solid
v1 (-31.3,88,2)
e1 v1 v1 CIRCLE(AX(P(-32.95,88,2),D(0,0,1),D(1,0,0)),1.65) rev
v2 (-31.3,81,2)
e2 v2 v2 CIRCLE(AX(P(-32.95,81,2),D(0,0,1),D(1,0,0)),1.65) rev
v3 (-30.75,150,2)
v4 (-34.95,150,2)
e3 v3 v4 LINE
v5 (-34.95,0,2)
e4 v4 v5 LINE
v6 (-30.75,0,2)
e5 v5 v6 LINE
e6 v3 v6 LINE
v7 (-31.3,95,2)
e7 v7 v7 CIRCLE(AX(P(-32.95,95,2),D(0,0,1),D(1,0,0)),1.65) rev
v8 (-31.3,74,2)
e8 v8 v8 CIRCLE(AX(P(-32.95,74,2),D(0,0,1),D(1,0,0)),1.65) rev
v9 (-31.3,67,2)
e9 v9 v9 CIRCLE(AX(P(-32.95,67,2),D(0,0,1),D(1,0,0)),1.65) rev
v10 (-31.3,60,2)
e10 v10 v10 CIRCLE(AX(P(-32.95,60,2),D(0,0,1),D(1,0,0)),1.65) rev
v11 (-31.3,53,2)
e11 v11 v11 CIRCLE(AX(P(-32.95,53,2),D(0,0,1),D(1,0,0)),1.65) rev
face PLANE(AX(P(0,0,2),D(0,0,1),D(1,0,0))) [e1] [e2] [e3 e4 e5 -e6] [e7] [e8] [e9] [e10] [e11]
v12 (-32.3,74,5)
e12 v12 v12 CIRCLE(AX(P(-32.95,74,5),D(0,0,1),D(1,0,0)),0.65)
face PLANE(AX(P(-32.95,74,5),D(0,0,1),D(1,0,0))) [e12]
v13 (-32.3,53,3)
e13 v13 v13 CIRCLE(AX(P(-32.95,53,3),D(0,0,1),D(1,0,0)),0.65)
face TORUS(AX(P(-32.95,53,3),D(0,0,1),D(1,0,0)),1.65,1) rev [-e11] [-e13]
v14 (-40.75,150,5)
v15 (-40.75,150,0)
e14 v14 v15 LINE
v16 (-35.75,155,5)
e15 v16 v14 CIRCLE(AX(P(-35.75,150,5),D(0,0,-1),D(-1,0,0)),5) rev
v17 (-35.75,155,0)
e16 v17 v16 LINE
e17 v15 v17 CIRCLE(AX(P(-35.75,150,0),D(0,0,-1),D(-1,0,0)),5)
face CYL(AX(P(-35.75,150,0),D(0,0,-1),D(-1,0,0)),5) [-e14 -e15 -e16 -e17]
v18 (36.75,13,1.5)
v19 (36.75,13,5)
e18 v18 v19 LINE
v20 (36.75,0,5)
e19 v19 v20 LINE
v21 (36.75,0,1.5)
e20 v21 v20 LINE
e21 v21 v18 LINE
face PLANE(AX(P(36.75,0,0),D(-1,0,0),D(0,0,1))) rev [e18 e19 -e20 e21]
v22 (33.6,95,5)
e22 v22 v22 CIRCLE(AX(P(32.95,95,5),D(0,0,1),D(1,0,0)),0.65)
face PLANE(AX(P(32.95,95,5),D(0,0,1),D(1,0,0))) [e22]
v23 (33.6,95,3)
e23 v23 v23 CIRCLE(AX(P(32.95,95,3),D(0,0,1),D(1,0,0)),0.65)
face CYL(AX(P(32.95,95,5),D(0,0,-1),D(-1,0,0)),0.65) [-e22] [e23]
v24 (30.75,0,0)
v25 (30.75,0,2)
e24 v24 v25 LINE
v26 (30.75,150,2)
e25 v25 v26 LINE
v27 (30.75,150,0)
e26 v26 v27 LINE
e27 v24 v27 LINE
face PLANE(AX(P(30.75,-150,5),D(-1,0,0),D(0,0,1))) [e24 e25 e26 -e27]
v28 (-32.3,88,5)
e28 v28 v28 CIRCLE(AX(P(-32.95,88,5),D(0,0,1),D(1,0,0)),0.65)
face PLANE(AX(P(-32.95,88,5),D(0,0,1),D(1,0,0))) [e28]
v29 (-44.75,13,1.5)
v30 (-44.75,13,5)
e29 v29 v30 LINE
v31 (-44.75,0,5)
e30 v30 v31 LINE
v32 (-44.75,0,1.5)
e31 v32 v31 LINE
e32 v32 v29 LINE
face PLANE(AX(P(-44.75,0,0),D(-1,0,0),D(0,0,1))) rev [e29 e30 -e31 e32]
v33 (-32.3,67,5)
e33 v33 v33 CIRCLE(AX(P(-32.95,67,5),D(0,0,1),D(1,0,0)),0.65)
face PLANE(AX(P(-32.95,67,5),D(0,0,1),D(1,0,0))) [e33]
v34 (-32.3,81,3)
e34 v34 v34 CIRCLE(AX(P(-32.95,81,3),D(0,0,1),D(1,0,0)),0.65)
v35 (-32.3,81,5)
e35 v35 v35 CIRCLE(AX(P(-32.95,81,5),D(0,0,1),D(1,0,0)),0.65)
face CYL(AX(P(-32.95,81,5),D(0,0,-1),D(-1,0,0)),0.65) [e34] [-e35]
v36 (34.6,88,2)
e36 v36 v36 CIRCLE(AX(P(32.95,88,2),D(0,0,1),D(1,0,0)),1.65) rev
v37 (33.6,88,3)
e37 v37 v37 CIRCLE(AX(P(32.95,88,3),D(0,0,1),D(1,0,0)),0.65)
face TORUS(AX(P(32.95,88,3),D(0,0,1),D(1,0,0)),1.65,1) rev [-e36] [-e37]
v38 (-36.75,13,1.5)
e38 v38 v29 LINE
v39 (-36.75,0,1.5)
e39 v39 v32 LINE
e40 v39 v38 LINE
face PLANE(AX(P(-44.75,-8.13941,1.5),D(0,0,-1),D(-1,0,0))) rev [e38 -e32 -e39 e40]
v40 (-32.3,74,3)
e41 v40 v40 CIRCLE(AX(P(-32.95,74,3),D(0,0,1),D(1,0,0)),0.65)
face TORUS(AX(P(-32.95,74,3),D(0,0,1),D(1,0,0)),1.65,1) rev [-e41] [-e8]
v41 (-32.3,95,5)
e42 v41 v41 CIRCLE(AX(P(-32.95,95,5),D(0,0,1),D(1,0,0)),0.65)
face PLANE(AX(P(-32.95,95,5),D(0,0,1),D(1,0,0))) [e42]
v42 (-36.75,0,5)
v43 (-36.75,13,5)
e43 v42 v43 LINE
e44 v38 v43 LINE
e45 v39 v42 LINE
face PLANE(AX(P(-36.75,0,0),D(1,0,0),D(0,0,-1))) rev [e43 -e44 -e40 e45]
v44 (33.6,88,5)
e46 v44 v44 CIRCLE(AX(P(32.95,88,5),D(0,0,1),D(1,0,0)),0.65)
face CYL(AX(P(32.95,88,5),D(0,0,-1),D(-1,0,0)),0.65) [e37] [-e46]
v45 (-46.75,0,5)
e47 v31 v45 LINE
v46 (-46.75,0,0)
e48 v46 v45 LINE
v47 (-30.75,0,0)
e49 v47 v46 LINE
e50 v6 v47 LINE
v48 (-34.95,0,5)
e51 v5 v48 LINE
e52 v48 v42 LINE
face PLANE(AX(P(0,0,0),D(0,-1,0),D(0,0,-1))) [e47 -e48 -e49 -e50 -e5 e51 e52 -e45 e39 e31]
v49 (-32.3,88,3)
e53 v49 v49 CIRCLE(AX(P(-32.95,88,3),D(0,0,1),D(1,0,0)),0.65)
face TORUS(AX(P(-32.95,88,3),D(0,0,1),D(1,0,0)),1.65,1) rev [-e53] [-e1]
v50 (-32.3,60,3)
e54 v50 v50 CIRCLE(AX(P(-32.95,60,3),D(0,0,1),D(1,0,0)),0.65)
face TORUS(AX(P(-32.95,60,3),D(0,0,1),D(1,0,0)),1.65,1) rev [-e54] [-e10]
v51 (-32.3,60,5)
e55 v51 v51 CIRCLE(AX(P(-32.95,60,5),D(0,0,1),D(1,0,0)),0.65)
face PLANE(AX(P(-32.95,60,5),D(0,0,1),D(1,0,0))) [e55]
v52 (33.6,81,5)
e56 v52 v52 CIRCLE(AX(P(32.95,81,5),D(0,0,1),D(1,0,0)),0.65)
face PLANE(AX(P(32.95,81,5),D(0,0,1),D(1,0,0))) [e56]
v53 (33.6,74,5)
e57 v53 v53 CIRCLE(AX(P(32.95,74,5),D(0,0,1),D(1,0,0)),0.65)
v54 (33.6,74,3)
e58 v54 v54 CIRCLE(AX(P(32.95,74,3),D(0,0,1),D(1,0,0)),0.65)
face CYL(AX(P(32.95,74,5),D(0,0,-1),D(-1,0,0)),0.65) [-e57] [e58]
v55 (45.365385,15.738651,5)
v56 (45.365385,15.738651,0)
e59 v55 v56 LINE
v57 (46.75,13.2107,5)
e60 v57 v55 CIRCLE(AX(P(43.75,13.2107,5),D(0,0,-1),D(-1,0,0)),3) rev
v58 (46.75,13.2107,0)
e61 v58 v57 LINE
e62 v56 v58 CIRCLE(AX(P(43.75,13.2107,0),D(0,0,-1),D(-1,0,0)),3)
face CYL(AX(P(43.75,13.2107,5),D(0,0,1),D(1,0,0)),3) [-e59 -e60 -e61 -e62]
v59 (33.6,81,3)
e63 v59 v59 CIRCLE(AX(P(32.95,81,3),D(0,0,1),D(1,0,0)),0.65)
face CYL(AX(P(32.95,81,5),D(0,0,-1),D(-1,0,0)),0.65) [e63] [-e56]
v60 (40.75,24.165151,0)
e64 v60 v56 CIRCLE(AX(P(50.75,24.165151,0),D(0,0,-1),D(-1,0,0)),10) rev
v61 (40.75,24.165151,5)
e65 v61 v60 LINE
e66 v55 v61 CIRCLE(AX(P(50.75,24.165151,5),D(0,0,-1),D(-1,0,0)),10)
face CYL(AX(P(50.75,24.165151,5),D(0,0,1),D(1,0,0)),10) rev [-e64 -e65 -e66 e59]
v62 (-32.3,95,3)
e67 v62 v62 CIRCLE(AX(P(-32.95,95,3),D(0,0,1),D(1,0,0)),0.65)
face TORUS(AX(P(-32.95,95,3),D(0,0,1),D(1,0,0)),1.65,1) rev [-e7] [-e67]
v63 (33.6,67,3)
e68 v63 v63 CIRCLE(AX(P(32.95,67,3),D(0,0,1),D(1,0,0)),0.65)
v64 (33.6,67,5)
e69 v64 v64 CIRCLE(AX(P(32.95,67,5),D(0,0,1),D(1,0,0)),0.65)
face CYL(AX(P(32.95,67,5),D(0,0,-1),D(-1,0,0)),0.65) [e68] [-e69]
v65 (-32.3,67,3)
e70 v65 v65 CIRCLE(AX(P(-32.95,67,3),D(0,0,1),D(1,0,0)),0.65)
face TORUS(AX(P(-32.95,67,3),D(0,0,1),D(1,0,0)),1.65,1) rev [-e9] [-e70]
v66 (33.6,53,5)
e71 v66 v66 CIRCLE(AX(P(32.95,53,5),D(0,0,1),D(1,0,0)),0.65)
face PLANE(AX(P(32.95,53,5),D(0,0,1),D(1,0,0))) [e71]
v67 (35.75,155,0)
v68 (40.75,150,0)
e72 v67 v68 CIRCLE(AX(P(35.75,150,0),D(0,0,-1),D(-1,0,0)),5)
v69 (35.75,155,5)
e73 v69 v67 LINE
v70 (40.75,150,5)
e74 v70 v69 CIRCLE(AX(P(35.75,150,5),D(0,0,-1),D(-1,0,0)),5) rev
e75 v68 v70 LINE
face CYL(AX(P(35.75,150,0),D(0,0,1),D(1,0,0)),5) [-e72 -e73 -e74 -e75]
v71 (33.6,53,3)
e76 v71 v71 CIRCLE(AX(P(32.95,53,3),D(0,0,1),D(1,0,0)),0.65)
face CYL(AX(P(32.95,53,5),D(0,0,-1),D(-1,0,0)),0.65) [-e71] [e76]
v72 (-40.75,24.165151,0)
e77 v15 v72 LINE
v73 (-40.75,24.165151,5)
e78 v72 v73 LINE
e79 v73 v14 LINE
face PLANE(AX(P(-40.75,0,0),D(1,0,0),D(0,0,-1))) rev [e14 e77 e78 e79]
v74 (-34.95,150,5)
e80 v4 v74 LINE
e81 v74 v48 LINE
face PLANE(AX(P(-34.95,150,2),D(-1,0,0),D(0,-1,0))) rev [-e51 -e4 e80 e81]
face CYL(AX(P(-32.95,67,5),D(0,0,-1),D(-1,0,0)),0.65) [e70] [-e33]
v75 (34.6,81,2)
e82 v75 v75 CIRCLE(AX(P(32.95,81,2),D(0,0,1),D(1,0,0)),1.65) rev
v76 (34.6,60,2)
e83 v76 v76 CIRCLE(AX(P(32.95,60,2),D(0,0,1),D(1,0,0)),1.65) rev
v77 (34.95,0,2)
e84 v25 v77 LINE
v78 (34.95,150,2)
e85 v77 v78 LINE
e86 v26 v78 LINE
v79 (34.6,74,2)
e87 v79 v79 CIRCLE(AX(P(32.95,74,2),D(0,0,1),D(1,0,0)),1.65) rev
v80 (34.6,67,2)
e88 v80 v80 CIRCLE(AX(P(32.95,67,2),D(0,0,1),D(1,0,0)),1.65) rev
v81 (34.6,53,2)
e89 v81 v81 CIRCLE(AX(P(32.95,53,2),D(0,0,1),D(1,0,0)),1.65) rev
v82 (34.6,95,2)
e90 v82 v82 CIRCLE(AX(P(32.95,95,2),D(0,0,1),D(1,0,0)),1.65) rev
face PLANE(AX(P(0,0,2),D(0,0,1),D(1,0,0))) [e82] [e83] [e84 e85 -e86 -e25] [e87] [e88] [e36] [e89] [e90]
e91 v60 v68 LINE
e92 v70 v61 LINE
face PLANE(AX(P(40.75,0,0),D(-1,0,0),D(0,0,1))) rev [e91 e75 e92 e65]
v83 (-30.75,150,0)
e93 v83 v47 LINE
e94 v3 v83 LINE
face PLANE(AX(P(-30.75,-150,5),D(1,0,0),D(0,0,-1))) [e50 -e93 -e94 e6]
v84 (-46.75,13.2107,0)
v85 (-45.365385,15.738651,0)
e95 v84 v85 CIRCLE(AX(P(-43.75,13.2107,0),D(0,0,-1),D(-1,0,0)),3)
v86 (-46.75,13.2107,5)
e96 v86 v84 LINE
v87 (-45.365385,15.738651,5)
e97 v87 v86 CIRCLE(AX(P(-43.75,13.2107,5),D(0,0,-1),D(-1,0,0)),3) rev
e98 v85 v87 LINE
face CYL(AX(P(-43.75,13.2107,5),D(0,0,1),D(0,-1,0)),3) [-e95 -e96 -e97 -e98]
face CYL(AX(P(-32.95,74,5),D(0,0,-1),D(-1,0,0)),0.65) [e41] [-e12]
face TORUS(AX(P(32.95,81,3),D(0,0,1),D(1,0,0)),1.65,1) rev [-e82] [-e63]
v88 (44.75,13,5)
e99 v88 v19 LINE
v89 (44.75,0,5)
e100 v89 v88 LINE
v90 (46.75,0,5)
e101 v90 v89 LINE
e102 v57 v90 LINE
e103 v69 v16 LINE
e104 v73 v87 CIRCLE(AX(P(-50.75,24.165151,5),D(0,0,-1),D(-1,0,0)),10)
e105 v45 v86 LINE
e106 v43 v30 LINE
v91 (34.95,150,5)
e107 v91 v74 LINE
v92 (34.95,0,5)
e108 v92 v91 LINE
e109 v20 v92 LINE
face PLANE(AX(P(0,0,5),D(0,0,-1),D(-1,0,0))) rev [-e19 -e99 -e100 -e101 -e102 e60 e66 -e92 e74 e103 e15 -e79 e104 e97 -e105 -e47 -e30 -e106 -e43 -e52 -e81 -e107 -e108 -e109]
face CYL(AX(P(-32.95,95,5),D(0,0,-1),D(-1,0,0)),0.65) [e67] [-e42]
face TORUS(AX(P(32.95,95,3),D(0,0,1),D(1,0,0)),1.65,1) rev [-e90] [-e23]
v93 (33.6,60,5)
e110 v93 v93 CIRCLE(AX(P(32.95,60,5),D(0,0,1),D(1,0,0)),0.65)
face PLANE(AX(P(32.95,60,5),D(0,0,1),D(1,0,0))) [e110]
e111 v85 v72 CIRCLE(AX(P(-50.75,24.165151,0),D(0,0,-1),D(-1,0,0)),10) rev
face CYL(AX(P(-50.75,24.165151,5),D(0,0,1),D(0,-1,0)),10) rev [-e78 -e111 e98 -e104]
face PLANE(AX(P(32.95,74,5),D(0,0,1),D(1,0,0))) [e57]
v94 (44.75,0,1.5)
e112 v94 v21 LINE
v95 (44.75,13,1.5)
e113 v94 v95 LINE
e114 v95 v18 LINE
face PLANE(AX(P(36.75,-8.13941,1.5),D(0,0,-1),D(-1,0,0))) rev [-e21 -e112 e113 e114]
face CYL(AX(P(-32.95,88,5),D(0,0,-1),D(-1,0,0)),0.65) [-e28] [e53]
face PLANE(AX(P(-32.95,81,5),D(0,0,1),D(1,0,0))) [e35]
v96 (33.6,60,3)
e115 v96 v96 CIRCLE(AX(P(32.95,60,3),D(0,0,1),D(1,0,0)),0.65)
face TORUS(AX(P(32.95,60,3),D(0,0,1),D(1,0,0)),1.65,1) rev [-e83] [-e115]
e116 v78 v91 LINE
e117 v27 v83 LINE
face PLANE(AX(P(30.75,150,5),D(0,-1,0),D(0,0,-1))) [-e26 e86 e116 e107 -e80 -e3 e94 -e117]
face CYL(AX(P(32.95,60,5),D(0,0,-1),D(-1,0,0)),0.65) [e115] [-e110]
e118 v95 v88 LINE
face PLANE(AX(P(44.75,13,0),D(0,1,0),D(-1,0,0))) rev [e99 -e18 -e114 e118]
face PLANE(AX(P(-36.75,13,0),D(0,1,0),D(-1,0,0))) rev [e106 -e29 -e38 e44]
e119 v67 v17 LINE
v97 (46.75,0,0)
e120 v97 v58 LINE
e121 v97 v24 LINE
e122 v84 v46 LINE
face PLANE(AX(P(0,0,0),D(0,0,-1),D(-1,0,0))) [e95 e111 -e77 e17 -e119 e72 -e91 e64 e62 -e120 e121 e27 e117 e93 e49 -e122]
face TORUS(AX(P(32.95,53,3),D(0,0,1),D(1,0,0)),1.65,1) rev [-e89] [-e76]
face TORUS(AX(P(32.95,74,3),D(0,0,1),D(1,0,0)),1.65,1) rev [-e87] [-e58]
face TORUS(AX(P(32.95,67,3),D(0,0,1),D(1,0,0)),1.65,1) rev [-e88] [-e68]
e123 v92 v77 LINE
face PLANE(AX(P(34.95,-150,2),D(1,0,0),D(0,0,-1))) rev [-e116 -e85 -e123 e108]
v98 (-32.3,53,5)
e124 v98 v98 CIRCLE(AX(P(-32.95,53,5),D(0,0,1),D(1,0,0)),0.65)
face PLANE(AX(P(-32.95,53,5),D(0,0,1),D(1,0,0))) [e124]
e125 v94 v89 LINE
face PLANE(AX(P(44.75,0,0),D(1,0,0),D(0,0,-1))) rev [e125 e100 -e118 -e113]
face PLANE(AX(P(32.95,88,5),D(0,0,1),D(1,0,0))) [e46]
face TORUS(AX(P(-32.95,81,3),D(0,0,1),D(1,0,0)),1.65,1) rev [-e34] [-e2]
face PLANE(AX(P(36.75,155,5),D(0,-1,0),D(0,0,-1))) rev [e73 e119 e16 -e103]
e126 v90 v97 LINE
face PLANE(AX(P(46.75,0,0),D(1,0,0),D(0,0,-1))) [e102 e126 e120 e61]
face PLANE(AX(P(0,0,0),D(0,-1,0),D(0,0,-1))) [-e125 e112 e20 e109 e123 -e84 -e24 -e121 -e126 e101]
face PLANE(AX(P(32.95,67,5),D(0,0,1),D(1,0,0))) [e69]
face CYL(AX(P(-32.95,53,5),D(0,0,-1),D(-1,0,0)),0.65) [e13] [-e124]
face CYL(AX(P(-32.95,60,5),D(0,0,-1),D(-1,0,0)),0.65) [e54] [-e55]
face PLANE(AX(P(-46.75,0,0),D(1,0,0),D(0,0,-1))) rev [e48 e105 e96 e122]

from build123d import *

# Parameters (mm, degrees)
STOCK_ARRAYRAMME_1_OUTLINE_R   = 0.65
STOCK_ARRAYRAMME_1_DEPTH       = 5
STOCK_ARRAYRAMME_1_2_OUTLINE_W = 4.2
STOCK_ARRAYRAMME_1_2_OUTLINE_H = 150
STOCK_ARRAYRAMME_1_2_OUTLINE_R = 0.65
STOCK_ARRAYRAMME_1_2_DEPTH     = 2
SKETCH1_W                      = 15
SKETCH1_H                      = 5
BOSS_EXTRUDE1_DEPTH            = 10
SKETCH2_W                      = 8
SKETCH2_H                      = 13
CUT_EXTRUDE1_DEPTH             = 162.97395624
SKETCH3_W                      = 15
SKETCH3_H                      = 5
BOSS_EXTRUDE2_DEPTH            = 10
SKETCH4_W                      = 8
SKETCH4_H                      = 13
CUT_EXTRUDE2_DEPTH             = 162.97395624
FILLET4_R                      = 1
SKETCH5_W                      = 8
SKETCH5_H                      = 1.5
BOSS_EXTRUDE3_DEPTH            = 13
SKETCH7_W                      = 140
SKETCH7_H                      = 5
BOSS_EXTRUDE4_DEPTH            = 4
SKETCH8_W                      = 140
SKETCH8_H                      = 5
BOSS_EXTRUDE5_DEPTH            = 4
FILLET5_R                      = 5
FILLET6_R                      = 10
FILLET7_R                      = 3


# Read off the part's stored shape, not the designer's step: Stock-arrayRamme-1
with BuildPart() as part:
    # Stock-arrayRamme-1 outline → Stock-arrayRamme-1 (new body)
    with BuildSketch(Plane.XY):
        Polygon((34.95, 150), (34.95, 0), (36.75, 0), (36.75, 155), (-36.75, 155), (-36.75, 0), (-34.95, 0), (-34.95, 150), align=None)
        with Locations((-32.95, 67)):
            Circle(STOCK_ARRAYRAMME_1_OUTLINE_R)
        with Locations((-32.95, 60)):
            Circle(STOCK_ARRAYRAMME_1_OUTLINE_R)
        with Locations((-32.95, 74)):
            Circle(STOCK_ARRAYRAMME_1_OUTLINE_R)
        with Locations((-32.95, 81)):
            Circle(STOCK_ARRAYRAMME_1_OUTLINE_R)
        with Locations((-32.95, 88)):
            Circle(STOCK_ARRAYRAMME_1_OUTLINE_R)
        with Locations((-32.95, 95)):
            Circle(STOCK_ARRAYRAMME_1_OUTLINE_R)
        with Locations((-32.95, 53)):
            Circle(STOCK_ARRAYRAMME_1_OUTLINE_R)
        with Locations((32.95, 67)):
            Circle(STOCK_ARRAYRAMME_1_OUTLINE_R)
        with Locations((32.95, 53)):
            Circle(STOCK_ARRAYRAMME_1_OUTLINE_R)
        with Locations((32.95, 60)):
            Circle(STOCK_ARRAYRAMME_1_OUTLINE_R)
        with Locations((32.95, 74)):
            Circle(STOCK_ARRAYRAMME_1_OUTLINE_R)
        with Locations((32.95, 81)):
            Circle(STOCK_ARRAYRAMME_1_OUTLINE_R)
        with Locations((32.95, 95)):
            Circle(STOCK_ARRAYRAMME_1_OUTLINE_R)
        with Locations((32.95, 88)):
            Circle(STOCK_ARRAYRAMME_1_OUTLINE_R)
    extrude(amount=STOCK_ARRAYRAMME_1_DEPTH)

    # Stock-arrayRamme-1 2 outline → Stock-arrayRamme-1 2 (add)
    # profile 1 of 2: a face of its own
    with BuildSketch(Plane.XY):
        with Locations((32.85, 75)):
            Rectangle(STOCK_ARRAYRAMME_1_2_OUTLINE_W, STOCK_ARRAYRAMME_1_2_OUTLINE_H)
        with Locations((32.95, 53)):
            Circle(STOCK_ARRAYRAMME_1_2_OUTLINE_R, mode=Mode.SUBTRACT)
        with Locations((32.95, 60)):
            Circle(STOCK_ARRAYRAMME_1_2_OUTLINE_R, mode=Mode.SUBTRACT)
        with Locations((32.95, 67)):
            Circle(STOCK_ARRAYRAMME_1_2_OUTLINE_R, mode=Mode.SUBTRACT)
        with Locations((32.95, 74)):
            Circle(STOCK_ARRAYRAMME_1_2_OUTLINE_R, mode=Mode.SUBTRACT)
        with Locations((32.95, 81)):
            Circle(STOCK_ARRAYRAMME_1_2_OUTLINE_R, mode=Mode.SUBTRACT)
        with Locations((32.95, 88)):
            Circle(STOCK_ARRAYRAMME_1_2_OUTLINE_R, mode=Mode.SUBTRACT)
        with Locations((32.95, 95)):
            Circle(STOCK_ARRAYRAMME_1_2_OUTLINE_R, mode=Mode.SUBTRACT)
    # profile 2 of 2: a face of its own
    with BuildSketch(Plane.XY):
        with Locations((-32.85, 75)):
            Rectangle(STOCK_ARRAYRAMME_1_2_OUTLINE_W, STOCK_ARRAYRAMME_1_2_OUTLINE_H)
        with Locations((-32.95, 53)):
            Circle(STOCK_ARRAYRAMME_1_2_OUTLINE_R, mode=Mode.SUBTRACT)
        with Locations((-32.95, 60)):
            Circle(STOCK_ARRAYRAMME_1_2_OUTLINE_R, mode=Mode.SUBTRACT)
        with Locations((-32.95, 67)):
            Circle(STOCK_ARRAYRAMME_1_2_OUTLINE_R, mode=Mode.SUBTRACT)
        with Locations((-32.95, 74)):
            Circle(STOCK_ARRAYRAMME_1_2_OUTLINE_R, mode=Mode.SUBTRACT)
        with Locations((-32.95, 81)):
            Circle(STOCK_ARRAYRAMME_1_2_OUTLINE_R, mode=Mode.SUBTRACT)
        with Locations((-32.95, 88)):
            Circle(STOCK_ARRAYRAMME_1_2_OUTLINE_R, mode=Mode.SUBTRACT)
        with Locations((-32.95, 95)):
            Circle(STOCK_ARRAYRAMME_1_2_OUTLINE_R, mode=Mode.SUBTRACT)
    extrude(amount=STOCK_ARRAYRAMME_1_2_DEPTH)

    # Sketch1 → Boss-Extrude1 (add)
    with BuildSketch(Plane.YZ.offset(36.75)):
        with Locations((7.5, 2.5)):
            Rectangle(SKETCH1_W, SKETCH1_H)
    extrude(amount=BOSS_EXTRUDE1_DEPTH)

    # Sketch2 → Cut-Extrude1 (cut, through all)
    with BuildSketch(Plane.XY.offset(5)):
        with Locations((40.75, 6.5)):
            Rectangle(SKETCH2_W, SKETCH2_H)
    extrude(amount=-CUT_EXTRUDE1_DEPTH, mode=Mode.SUBTRACT)

    # Sketch3 → Boss-Extrude2 (add)
    with BuildSketch(Plane(origin=(-36.75, 0, 0), x_dir=(0, -1, 0), z_dir=(-1, 0, 0))):
        with Locations((-7.5, 2.5)):
            Rectangle(SKETCH3_W, SKETCH3_H)
    extrude(amount=BOSS_EXTRUDE2_DEPTH)

    # Sketch4 → Cut-Extrude2 (cut, through all)
    with BuildSketch(Plane.XY.offset(5)):
        with Locations((-40.75, 6.5)):
            Rectangle(SKETCH4_W, SKETCH4_H)
    extrude(amount=-CUT_EXTRUDE2_DEPTH, mode=Mode.SUBTRACT)

    # Fillet4
    fillet4_edges = [part.edges().sort_by_distance(p)[0] for p in [
        (32.3, 60, 2),
        (32.3, 74, 2),
        (32.3, 81, 2),
        (32.3, 88, 2),
        (32.3, 95, 2),
        (-33.6, 95, 2),
        (-33.6, 88, 2),
        (-33.6, 81, 2),
        (-33.6, 74, 2),
        (-33.6, 60, 2),
        (32.3, 53, 2),
        (32.3, 67, 2),
        (-33.6, 67, 2),
        (-33.6, 53, 2),
    ]]
    fillet(fillet4_edges, radius=FILLET4_R)

    # Sketch5 → Boss-Extrude3 (add)
    with BuildSketch(Plane.XZ.offset(-13)):
        with Locations((40.75, 0.75)):
            Rectangle(SKETCH5_W, SKETCH5_H)
        with Locations((-40.75, 0.75)):
            Rectangle(SKETCH5_W, SKETCH5_H)
    extrude(amount=BOSS_EXTRUDE3_DEPTH)

    # Sketch7 → Boss-Extrude4 (add)
    with BuildSketch(Plane.YZ.offset(36.75)):
        with Locations((85, 2.5)):
            Rectangle(SKETCH7_W, SKETCH7_H)
    extrude(amount=BOSS_EXTRUDE4_DEPTH)

    # Sketch8 → Boss-Extrude5 (add)
    with BuildSketch(Plane(origin=(-36.75, 0, 0), x_dir=(0, -1, 0), z_dir=(-1, 0, 0))):
        with Locations((-85, 2.5)):
            Rectangle(SKETCH8_W, SKETCH8_H)
    extrude(amount=BOSS_EXTRUDE5_DEPTH)

    # Fillet5
    fillet5_edges = [part.edges().sort_by_distance(p)[0] for p in [
        (40.75, 155, 2.5),
        (-40.75, 155, 2.5),
    ]]
    fillet(fillet5_edges, radius=FILLET5_R)

    # Fillet6
    # the kernel refuses this fillet: 10 mm, written as the material it adds along each edge
    with BuildSketch(Plane(origin=(40.75, 15, 5), x_dir=(0, 1, 0), z_dir=(0, 0, -1)), Plane(origin=(-40.75, 15, 0), x_dir=(0, 1, 0), z_dir=(0, 0, 1))) as fillet6_piece_1:
        with BuildLine():
            CenterArc((9.16515139, 10), FILLET6_R, 203.578178478, 66.421821522)
            Line((0, 6), (-0.183303028, 5.92))
            ThreePointArc((-0.183303028, 5.92), (-0.2, 3), (-0.2, 0))
            Line((-0.2, 0), (0, -0.2))
            Line((0, -0.2), (9.16515139, -0.2))
            Line((9.16515139, -0.2), (9.16515139, 0))
        make_face()
    extrude(amount=5)

    # Fillet7
    fillet7_edges = [part.edges().sort_by_distance(p)[0] for p in [
        (-46.75, 15, 2.5),
        (46.75, 15, 2.5),
    ]]
    fillet(fillet7_edges, radius=FILLET7_R)


solid = part.part
